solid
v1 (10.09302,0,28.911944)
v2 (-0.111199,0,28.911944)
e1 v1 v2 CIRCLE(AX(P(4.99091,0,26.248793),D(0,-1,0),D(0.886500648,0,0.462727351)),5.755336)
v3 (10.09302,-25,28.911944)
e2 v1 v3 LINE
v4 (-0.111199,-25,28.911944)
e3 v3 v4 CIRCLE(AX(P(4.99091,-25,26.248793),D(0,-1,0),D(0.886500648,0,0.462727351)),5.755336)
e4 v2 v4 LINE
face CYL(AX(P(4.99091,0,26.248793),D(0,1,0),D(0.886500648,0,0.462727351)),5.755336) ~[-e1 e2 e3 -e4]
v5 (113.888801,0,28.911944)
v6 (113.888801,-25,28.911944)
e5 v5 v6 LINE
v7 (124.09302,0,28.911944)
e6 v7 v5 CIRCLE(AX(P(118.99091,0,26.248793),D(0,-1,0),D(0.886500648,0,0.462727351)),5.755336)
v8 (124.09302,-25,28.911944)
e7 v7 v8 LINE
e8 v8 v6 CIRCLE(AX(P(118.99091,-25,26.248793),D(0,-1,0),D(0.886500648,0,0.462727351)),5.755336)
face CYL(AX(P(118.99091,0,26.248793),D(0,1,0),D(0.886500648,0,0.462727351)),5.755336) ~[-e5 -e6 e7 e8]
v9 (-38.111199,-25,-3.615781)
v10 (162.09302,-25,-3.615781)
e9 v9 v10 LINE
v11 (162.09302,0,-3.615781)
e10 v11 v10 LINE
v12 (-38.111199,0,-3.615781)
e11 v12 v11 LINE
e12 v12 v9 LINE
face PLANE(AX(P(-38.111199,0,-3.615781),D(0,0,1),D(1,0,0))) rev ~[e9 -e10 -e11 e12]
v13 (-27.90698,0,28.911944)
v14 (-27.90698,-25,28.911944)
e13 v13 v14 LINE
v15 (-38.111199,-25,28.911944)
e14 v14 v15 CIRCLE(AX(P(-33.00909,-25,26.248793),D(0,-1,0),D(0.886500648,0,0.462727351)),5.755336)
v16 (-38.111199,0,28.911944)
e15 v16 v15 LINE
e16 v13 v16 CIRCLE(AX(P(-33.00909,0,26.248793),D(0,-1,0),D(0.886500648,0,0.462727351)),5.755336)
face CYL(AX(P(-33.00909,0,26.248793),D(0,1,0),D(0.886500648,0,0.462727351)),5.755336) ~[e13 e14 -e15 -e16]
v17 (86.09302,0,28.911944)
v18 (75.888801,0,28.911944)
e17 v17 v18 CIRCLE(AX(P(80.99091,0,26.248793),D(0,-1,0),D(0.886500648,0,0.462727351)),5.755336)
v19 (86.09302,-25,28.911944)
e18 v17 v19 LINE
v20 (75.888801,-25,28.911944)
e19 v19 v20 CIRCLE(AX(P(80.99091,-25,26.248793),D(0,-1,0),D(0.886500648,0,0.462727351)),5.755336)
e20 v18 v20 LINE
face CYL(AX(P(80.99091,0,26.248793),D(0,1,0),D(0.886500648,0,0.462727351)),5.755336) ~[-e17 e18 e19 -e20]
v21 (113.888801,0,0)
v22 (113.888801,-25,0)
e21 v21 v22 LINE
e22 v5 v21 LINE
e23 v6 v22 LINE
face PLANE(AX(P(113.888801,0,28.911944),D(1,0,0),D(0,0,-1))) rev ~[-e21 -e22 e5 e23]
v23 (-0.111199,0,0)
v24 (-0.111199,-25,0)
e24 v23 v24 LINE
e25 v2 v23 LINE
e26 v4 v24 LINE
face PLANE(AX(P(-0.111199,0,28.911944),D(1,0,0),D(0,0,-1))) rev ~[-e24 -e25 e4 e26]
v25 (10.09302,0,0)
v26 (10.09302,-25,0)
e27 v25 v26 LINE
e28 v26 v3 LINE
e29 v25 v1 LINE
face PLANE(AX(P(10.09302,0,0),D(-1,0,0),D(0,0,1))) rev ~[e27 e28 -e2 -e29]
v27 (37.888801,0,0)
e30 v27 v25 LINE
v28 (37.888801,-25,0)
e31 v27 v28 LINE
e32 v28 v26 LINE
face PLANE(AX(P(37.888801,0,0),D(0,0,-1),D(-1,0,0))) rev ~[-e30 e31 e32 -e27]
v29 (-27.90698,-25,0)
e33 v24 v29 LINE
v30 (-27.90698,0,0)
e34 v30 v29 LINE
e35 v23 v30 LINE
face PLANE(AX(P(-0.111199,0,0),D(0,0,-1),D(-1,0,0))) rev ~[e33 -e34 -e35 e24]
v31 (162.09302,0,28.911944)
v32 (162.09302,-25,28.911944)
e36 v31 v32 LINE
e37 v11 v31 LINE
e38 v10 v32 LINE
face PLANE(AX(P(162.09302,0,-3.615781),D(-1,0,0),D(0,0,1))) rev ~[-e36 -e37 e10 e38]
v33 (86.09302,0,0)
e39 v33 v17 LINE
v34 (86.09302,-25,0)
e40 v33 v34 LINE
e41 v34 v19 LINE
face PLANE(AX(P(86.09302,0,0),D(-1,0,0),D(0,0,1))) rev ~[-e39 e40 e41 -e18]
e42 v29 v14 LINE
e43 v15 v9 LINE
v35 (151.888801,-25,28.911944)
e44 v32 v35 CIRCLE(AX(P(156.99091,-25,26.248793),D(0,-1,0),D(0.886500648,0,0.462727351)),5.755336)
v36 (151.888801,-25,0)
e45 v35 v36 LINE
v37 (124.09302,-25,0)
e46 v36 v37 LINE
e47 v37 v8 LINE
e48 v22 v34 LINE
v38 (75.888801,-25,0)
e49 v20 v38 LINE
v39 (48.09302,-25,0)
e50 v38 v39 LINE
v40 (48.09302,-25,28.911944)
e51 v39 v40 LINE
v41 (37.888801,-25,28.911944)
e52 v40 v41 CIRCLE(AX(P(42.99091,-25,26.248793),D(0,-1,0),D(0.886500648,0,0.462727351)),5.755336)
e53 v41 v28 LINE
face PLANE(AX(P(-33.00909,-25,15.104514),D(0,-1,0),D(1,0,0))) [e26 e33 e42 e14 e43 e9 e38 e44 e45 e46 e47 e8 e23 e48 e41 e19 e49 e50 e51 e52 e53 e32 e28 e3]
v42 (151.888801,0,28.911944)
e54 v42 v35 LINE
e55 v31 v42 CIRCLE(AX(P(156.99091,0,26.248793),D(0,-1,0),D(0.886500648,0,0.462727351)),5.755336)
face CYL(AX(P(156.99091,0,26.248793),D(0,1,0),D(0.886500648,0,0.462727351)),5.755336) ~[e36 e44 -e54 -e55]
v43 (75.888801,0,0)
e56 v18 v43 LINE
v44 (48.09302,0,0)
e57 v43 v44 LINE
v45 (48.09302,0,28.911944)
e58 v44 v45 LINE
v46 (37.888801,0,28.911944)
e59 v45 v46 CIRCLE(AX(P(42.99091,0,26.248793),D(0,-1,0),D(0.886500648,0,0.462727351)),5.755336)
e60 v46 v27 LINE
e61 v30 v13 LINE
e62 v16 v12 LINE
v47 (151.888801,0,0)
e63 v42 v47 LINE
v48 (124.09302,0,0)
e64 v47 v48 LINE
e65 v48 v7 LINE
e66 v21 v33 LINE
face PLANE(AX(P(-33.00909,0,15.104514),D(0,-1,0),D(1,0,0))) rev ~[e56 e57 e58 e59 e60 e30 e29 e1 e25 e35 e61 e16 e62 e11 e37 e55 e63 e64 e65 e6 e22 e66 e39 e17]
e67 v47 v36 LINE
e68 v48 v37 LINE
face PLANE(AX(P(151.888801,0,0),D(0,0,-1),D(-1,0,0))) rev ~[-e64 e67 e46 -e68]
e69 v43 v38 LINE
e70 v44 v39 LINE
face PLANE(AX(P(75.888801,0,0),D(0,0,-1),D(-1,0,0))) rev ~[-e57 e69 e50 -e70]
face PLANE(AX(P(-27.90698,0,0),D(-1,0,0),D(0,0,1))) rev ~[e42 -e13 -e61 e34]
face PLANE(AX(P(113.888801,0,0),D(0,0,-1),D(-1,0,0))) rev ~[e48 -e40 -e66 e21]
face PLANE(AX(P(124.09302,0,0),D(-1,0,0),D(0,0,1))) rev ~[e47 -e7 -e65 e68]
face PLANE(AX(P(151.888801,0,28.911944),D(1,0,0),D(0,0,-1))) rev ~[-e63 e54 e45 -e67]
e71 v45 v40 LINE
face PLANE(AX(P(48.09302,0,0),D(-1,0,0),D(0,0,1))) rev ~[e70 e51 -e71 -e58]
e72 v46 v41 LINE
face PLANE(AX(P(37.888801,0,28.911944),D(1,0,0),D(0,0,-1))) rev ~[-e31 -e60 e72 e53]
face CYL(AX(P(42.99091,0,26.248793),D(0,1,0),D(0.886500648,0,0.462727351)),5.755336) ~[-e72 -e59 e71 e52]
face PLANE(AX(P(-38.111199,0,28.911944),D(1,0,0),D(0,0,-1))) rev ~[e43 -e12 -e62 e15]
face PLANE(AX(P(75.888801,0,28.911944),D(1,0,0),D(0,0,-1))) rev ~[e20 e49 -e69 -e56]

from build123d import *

# Parameters (mm, degrees)
F1_DEPTH = 25


# Not quite as in the source:
# - a feature names something its author has since deleted; it is built from what else it names


with BuildPart() as f1:
    # F0 (on Front) → F1 (new body)
    with BuildSketch(Plane.XZ):
        with BuildLine():
            Line((-38.1111986935, 28.9119444788), (-38.1111986935, 0))
            Line((-38.1111986935, 0), (-27.9069803655, 0))
            Line((-27.9069803655, 0), (-27.9069803655, 28.9119444788))
            ThreePointArc((-27.9069803655, 28.9119444788), (-33.0090895295, 32.0041291416), (-38.1111986935, 28.9119444788))
        make_face()
        with BuildLine():
            Line((-0.1111986935, 28.9119444788), (-0.1111986935, 0))
            Line((-0.1111986935, 0), (10.0930196345, 0))
            Line((10.0930196345, 0), (10.0930196345, 28.9119444788))
            ThreePointArc((10.0930196345, 28.9119444788), (4.9909104705, 32.0041291416), (-0.1111986935, 28.9119444788))
        make_face()
        with BuildLine():
            Line((37.8888013065, 28.9119444788), (37.8888013065, 0))
            Line((37.8888013065, 0), (48.0930196345, 0))
            Line((48.0930196345, 0), (48.0930196345, 28.9119444788))
            ThreePointArc((48.0930196345, 28.9119444788), (42.9909104705, 32.0041291416), (37.8888013065, 28.9119444788))
        make_face()
        with BuildLine():
            Line((75.8888013065, 28.9119444788), (75.8888013065, 0))
            Line((75.8888013065, 0), (86.0930196345, 0))
            Line((86.0930196345, 0), (86.0930196345, 28.9119444788))
            ThreePointArc((86.0930196345, 28.9119444788), (80.9909104705, 32.0041291416), (75.8888013065, 28.9119444788))
        make_face()
        with BuildLine():
            Line((113.8888013065, 0), (124.0930196345, 0))
            Line((124.0930196345, 0), (124.0930196345, 28.9119444788))
            ThreePointArc((124.0930196345, 28.9119444788), (118.9909104705, 32.0041291416), (113.8888013065, 28.9119444788))
            Line((113.8888013065, 28.9119444788), (113.8888013065, 0))
        make_face()
        with BuildLine():
            Line((151.8888013065, 0), (162.0930196345, 0))
            Line((162.0930196345, 0), (162.0930196345, 28.9119444788))
            ThreePointArc((162.0930196345, 28.9119444788), (156.9909104705, 32.0041291416), (151.8888013065, 28.9119444788))
            Line((151.8888013065, 28.9119444788), (151.8888013065, 0))
        make_face()
        Polygon((-27.9069803655, 0), (-38.1111986935, 0), (-38.1111986935, -3.615781432), (162.0930196345, -3.615781432), (162.0930196345, 0), (151.8888013065, 0), (146.6320851445, 0), (131.5820539594, 0), (124.0930196345, 0), (113.8888013065, 0), (108.6320851445, 0), (93.5820539594, 0), (86.0930196345, 0), (75.8888013065, 0), (70.6320851445, 0), (55.5820539594, 0), (48.0930196345, 0), (37.8888013065, 0), (32.6320851445, 0), (10.0930196345, 0), (-0.1111986935, 0), (-5.3679148555, 0), align=None)
    extrude(amount=F1_DEPTH)


solid = f1.part
